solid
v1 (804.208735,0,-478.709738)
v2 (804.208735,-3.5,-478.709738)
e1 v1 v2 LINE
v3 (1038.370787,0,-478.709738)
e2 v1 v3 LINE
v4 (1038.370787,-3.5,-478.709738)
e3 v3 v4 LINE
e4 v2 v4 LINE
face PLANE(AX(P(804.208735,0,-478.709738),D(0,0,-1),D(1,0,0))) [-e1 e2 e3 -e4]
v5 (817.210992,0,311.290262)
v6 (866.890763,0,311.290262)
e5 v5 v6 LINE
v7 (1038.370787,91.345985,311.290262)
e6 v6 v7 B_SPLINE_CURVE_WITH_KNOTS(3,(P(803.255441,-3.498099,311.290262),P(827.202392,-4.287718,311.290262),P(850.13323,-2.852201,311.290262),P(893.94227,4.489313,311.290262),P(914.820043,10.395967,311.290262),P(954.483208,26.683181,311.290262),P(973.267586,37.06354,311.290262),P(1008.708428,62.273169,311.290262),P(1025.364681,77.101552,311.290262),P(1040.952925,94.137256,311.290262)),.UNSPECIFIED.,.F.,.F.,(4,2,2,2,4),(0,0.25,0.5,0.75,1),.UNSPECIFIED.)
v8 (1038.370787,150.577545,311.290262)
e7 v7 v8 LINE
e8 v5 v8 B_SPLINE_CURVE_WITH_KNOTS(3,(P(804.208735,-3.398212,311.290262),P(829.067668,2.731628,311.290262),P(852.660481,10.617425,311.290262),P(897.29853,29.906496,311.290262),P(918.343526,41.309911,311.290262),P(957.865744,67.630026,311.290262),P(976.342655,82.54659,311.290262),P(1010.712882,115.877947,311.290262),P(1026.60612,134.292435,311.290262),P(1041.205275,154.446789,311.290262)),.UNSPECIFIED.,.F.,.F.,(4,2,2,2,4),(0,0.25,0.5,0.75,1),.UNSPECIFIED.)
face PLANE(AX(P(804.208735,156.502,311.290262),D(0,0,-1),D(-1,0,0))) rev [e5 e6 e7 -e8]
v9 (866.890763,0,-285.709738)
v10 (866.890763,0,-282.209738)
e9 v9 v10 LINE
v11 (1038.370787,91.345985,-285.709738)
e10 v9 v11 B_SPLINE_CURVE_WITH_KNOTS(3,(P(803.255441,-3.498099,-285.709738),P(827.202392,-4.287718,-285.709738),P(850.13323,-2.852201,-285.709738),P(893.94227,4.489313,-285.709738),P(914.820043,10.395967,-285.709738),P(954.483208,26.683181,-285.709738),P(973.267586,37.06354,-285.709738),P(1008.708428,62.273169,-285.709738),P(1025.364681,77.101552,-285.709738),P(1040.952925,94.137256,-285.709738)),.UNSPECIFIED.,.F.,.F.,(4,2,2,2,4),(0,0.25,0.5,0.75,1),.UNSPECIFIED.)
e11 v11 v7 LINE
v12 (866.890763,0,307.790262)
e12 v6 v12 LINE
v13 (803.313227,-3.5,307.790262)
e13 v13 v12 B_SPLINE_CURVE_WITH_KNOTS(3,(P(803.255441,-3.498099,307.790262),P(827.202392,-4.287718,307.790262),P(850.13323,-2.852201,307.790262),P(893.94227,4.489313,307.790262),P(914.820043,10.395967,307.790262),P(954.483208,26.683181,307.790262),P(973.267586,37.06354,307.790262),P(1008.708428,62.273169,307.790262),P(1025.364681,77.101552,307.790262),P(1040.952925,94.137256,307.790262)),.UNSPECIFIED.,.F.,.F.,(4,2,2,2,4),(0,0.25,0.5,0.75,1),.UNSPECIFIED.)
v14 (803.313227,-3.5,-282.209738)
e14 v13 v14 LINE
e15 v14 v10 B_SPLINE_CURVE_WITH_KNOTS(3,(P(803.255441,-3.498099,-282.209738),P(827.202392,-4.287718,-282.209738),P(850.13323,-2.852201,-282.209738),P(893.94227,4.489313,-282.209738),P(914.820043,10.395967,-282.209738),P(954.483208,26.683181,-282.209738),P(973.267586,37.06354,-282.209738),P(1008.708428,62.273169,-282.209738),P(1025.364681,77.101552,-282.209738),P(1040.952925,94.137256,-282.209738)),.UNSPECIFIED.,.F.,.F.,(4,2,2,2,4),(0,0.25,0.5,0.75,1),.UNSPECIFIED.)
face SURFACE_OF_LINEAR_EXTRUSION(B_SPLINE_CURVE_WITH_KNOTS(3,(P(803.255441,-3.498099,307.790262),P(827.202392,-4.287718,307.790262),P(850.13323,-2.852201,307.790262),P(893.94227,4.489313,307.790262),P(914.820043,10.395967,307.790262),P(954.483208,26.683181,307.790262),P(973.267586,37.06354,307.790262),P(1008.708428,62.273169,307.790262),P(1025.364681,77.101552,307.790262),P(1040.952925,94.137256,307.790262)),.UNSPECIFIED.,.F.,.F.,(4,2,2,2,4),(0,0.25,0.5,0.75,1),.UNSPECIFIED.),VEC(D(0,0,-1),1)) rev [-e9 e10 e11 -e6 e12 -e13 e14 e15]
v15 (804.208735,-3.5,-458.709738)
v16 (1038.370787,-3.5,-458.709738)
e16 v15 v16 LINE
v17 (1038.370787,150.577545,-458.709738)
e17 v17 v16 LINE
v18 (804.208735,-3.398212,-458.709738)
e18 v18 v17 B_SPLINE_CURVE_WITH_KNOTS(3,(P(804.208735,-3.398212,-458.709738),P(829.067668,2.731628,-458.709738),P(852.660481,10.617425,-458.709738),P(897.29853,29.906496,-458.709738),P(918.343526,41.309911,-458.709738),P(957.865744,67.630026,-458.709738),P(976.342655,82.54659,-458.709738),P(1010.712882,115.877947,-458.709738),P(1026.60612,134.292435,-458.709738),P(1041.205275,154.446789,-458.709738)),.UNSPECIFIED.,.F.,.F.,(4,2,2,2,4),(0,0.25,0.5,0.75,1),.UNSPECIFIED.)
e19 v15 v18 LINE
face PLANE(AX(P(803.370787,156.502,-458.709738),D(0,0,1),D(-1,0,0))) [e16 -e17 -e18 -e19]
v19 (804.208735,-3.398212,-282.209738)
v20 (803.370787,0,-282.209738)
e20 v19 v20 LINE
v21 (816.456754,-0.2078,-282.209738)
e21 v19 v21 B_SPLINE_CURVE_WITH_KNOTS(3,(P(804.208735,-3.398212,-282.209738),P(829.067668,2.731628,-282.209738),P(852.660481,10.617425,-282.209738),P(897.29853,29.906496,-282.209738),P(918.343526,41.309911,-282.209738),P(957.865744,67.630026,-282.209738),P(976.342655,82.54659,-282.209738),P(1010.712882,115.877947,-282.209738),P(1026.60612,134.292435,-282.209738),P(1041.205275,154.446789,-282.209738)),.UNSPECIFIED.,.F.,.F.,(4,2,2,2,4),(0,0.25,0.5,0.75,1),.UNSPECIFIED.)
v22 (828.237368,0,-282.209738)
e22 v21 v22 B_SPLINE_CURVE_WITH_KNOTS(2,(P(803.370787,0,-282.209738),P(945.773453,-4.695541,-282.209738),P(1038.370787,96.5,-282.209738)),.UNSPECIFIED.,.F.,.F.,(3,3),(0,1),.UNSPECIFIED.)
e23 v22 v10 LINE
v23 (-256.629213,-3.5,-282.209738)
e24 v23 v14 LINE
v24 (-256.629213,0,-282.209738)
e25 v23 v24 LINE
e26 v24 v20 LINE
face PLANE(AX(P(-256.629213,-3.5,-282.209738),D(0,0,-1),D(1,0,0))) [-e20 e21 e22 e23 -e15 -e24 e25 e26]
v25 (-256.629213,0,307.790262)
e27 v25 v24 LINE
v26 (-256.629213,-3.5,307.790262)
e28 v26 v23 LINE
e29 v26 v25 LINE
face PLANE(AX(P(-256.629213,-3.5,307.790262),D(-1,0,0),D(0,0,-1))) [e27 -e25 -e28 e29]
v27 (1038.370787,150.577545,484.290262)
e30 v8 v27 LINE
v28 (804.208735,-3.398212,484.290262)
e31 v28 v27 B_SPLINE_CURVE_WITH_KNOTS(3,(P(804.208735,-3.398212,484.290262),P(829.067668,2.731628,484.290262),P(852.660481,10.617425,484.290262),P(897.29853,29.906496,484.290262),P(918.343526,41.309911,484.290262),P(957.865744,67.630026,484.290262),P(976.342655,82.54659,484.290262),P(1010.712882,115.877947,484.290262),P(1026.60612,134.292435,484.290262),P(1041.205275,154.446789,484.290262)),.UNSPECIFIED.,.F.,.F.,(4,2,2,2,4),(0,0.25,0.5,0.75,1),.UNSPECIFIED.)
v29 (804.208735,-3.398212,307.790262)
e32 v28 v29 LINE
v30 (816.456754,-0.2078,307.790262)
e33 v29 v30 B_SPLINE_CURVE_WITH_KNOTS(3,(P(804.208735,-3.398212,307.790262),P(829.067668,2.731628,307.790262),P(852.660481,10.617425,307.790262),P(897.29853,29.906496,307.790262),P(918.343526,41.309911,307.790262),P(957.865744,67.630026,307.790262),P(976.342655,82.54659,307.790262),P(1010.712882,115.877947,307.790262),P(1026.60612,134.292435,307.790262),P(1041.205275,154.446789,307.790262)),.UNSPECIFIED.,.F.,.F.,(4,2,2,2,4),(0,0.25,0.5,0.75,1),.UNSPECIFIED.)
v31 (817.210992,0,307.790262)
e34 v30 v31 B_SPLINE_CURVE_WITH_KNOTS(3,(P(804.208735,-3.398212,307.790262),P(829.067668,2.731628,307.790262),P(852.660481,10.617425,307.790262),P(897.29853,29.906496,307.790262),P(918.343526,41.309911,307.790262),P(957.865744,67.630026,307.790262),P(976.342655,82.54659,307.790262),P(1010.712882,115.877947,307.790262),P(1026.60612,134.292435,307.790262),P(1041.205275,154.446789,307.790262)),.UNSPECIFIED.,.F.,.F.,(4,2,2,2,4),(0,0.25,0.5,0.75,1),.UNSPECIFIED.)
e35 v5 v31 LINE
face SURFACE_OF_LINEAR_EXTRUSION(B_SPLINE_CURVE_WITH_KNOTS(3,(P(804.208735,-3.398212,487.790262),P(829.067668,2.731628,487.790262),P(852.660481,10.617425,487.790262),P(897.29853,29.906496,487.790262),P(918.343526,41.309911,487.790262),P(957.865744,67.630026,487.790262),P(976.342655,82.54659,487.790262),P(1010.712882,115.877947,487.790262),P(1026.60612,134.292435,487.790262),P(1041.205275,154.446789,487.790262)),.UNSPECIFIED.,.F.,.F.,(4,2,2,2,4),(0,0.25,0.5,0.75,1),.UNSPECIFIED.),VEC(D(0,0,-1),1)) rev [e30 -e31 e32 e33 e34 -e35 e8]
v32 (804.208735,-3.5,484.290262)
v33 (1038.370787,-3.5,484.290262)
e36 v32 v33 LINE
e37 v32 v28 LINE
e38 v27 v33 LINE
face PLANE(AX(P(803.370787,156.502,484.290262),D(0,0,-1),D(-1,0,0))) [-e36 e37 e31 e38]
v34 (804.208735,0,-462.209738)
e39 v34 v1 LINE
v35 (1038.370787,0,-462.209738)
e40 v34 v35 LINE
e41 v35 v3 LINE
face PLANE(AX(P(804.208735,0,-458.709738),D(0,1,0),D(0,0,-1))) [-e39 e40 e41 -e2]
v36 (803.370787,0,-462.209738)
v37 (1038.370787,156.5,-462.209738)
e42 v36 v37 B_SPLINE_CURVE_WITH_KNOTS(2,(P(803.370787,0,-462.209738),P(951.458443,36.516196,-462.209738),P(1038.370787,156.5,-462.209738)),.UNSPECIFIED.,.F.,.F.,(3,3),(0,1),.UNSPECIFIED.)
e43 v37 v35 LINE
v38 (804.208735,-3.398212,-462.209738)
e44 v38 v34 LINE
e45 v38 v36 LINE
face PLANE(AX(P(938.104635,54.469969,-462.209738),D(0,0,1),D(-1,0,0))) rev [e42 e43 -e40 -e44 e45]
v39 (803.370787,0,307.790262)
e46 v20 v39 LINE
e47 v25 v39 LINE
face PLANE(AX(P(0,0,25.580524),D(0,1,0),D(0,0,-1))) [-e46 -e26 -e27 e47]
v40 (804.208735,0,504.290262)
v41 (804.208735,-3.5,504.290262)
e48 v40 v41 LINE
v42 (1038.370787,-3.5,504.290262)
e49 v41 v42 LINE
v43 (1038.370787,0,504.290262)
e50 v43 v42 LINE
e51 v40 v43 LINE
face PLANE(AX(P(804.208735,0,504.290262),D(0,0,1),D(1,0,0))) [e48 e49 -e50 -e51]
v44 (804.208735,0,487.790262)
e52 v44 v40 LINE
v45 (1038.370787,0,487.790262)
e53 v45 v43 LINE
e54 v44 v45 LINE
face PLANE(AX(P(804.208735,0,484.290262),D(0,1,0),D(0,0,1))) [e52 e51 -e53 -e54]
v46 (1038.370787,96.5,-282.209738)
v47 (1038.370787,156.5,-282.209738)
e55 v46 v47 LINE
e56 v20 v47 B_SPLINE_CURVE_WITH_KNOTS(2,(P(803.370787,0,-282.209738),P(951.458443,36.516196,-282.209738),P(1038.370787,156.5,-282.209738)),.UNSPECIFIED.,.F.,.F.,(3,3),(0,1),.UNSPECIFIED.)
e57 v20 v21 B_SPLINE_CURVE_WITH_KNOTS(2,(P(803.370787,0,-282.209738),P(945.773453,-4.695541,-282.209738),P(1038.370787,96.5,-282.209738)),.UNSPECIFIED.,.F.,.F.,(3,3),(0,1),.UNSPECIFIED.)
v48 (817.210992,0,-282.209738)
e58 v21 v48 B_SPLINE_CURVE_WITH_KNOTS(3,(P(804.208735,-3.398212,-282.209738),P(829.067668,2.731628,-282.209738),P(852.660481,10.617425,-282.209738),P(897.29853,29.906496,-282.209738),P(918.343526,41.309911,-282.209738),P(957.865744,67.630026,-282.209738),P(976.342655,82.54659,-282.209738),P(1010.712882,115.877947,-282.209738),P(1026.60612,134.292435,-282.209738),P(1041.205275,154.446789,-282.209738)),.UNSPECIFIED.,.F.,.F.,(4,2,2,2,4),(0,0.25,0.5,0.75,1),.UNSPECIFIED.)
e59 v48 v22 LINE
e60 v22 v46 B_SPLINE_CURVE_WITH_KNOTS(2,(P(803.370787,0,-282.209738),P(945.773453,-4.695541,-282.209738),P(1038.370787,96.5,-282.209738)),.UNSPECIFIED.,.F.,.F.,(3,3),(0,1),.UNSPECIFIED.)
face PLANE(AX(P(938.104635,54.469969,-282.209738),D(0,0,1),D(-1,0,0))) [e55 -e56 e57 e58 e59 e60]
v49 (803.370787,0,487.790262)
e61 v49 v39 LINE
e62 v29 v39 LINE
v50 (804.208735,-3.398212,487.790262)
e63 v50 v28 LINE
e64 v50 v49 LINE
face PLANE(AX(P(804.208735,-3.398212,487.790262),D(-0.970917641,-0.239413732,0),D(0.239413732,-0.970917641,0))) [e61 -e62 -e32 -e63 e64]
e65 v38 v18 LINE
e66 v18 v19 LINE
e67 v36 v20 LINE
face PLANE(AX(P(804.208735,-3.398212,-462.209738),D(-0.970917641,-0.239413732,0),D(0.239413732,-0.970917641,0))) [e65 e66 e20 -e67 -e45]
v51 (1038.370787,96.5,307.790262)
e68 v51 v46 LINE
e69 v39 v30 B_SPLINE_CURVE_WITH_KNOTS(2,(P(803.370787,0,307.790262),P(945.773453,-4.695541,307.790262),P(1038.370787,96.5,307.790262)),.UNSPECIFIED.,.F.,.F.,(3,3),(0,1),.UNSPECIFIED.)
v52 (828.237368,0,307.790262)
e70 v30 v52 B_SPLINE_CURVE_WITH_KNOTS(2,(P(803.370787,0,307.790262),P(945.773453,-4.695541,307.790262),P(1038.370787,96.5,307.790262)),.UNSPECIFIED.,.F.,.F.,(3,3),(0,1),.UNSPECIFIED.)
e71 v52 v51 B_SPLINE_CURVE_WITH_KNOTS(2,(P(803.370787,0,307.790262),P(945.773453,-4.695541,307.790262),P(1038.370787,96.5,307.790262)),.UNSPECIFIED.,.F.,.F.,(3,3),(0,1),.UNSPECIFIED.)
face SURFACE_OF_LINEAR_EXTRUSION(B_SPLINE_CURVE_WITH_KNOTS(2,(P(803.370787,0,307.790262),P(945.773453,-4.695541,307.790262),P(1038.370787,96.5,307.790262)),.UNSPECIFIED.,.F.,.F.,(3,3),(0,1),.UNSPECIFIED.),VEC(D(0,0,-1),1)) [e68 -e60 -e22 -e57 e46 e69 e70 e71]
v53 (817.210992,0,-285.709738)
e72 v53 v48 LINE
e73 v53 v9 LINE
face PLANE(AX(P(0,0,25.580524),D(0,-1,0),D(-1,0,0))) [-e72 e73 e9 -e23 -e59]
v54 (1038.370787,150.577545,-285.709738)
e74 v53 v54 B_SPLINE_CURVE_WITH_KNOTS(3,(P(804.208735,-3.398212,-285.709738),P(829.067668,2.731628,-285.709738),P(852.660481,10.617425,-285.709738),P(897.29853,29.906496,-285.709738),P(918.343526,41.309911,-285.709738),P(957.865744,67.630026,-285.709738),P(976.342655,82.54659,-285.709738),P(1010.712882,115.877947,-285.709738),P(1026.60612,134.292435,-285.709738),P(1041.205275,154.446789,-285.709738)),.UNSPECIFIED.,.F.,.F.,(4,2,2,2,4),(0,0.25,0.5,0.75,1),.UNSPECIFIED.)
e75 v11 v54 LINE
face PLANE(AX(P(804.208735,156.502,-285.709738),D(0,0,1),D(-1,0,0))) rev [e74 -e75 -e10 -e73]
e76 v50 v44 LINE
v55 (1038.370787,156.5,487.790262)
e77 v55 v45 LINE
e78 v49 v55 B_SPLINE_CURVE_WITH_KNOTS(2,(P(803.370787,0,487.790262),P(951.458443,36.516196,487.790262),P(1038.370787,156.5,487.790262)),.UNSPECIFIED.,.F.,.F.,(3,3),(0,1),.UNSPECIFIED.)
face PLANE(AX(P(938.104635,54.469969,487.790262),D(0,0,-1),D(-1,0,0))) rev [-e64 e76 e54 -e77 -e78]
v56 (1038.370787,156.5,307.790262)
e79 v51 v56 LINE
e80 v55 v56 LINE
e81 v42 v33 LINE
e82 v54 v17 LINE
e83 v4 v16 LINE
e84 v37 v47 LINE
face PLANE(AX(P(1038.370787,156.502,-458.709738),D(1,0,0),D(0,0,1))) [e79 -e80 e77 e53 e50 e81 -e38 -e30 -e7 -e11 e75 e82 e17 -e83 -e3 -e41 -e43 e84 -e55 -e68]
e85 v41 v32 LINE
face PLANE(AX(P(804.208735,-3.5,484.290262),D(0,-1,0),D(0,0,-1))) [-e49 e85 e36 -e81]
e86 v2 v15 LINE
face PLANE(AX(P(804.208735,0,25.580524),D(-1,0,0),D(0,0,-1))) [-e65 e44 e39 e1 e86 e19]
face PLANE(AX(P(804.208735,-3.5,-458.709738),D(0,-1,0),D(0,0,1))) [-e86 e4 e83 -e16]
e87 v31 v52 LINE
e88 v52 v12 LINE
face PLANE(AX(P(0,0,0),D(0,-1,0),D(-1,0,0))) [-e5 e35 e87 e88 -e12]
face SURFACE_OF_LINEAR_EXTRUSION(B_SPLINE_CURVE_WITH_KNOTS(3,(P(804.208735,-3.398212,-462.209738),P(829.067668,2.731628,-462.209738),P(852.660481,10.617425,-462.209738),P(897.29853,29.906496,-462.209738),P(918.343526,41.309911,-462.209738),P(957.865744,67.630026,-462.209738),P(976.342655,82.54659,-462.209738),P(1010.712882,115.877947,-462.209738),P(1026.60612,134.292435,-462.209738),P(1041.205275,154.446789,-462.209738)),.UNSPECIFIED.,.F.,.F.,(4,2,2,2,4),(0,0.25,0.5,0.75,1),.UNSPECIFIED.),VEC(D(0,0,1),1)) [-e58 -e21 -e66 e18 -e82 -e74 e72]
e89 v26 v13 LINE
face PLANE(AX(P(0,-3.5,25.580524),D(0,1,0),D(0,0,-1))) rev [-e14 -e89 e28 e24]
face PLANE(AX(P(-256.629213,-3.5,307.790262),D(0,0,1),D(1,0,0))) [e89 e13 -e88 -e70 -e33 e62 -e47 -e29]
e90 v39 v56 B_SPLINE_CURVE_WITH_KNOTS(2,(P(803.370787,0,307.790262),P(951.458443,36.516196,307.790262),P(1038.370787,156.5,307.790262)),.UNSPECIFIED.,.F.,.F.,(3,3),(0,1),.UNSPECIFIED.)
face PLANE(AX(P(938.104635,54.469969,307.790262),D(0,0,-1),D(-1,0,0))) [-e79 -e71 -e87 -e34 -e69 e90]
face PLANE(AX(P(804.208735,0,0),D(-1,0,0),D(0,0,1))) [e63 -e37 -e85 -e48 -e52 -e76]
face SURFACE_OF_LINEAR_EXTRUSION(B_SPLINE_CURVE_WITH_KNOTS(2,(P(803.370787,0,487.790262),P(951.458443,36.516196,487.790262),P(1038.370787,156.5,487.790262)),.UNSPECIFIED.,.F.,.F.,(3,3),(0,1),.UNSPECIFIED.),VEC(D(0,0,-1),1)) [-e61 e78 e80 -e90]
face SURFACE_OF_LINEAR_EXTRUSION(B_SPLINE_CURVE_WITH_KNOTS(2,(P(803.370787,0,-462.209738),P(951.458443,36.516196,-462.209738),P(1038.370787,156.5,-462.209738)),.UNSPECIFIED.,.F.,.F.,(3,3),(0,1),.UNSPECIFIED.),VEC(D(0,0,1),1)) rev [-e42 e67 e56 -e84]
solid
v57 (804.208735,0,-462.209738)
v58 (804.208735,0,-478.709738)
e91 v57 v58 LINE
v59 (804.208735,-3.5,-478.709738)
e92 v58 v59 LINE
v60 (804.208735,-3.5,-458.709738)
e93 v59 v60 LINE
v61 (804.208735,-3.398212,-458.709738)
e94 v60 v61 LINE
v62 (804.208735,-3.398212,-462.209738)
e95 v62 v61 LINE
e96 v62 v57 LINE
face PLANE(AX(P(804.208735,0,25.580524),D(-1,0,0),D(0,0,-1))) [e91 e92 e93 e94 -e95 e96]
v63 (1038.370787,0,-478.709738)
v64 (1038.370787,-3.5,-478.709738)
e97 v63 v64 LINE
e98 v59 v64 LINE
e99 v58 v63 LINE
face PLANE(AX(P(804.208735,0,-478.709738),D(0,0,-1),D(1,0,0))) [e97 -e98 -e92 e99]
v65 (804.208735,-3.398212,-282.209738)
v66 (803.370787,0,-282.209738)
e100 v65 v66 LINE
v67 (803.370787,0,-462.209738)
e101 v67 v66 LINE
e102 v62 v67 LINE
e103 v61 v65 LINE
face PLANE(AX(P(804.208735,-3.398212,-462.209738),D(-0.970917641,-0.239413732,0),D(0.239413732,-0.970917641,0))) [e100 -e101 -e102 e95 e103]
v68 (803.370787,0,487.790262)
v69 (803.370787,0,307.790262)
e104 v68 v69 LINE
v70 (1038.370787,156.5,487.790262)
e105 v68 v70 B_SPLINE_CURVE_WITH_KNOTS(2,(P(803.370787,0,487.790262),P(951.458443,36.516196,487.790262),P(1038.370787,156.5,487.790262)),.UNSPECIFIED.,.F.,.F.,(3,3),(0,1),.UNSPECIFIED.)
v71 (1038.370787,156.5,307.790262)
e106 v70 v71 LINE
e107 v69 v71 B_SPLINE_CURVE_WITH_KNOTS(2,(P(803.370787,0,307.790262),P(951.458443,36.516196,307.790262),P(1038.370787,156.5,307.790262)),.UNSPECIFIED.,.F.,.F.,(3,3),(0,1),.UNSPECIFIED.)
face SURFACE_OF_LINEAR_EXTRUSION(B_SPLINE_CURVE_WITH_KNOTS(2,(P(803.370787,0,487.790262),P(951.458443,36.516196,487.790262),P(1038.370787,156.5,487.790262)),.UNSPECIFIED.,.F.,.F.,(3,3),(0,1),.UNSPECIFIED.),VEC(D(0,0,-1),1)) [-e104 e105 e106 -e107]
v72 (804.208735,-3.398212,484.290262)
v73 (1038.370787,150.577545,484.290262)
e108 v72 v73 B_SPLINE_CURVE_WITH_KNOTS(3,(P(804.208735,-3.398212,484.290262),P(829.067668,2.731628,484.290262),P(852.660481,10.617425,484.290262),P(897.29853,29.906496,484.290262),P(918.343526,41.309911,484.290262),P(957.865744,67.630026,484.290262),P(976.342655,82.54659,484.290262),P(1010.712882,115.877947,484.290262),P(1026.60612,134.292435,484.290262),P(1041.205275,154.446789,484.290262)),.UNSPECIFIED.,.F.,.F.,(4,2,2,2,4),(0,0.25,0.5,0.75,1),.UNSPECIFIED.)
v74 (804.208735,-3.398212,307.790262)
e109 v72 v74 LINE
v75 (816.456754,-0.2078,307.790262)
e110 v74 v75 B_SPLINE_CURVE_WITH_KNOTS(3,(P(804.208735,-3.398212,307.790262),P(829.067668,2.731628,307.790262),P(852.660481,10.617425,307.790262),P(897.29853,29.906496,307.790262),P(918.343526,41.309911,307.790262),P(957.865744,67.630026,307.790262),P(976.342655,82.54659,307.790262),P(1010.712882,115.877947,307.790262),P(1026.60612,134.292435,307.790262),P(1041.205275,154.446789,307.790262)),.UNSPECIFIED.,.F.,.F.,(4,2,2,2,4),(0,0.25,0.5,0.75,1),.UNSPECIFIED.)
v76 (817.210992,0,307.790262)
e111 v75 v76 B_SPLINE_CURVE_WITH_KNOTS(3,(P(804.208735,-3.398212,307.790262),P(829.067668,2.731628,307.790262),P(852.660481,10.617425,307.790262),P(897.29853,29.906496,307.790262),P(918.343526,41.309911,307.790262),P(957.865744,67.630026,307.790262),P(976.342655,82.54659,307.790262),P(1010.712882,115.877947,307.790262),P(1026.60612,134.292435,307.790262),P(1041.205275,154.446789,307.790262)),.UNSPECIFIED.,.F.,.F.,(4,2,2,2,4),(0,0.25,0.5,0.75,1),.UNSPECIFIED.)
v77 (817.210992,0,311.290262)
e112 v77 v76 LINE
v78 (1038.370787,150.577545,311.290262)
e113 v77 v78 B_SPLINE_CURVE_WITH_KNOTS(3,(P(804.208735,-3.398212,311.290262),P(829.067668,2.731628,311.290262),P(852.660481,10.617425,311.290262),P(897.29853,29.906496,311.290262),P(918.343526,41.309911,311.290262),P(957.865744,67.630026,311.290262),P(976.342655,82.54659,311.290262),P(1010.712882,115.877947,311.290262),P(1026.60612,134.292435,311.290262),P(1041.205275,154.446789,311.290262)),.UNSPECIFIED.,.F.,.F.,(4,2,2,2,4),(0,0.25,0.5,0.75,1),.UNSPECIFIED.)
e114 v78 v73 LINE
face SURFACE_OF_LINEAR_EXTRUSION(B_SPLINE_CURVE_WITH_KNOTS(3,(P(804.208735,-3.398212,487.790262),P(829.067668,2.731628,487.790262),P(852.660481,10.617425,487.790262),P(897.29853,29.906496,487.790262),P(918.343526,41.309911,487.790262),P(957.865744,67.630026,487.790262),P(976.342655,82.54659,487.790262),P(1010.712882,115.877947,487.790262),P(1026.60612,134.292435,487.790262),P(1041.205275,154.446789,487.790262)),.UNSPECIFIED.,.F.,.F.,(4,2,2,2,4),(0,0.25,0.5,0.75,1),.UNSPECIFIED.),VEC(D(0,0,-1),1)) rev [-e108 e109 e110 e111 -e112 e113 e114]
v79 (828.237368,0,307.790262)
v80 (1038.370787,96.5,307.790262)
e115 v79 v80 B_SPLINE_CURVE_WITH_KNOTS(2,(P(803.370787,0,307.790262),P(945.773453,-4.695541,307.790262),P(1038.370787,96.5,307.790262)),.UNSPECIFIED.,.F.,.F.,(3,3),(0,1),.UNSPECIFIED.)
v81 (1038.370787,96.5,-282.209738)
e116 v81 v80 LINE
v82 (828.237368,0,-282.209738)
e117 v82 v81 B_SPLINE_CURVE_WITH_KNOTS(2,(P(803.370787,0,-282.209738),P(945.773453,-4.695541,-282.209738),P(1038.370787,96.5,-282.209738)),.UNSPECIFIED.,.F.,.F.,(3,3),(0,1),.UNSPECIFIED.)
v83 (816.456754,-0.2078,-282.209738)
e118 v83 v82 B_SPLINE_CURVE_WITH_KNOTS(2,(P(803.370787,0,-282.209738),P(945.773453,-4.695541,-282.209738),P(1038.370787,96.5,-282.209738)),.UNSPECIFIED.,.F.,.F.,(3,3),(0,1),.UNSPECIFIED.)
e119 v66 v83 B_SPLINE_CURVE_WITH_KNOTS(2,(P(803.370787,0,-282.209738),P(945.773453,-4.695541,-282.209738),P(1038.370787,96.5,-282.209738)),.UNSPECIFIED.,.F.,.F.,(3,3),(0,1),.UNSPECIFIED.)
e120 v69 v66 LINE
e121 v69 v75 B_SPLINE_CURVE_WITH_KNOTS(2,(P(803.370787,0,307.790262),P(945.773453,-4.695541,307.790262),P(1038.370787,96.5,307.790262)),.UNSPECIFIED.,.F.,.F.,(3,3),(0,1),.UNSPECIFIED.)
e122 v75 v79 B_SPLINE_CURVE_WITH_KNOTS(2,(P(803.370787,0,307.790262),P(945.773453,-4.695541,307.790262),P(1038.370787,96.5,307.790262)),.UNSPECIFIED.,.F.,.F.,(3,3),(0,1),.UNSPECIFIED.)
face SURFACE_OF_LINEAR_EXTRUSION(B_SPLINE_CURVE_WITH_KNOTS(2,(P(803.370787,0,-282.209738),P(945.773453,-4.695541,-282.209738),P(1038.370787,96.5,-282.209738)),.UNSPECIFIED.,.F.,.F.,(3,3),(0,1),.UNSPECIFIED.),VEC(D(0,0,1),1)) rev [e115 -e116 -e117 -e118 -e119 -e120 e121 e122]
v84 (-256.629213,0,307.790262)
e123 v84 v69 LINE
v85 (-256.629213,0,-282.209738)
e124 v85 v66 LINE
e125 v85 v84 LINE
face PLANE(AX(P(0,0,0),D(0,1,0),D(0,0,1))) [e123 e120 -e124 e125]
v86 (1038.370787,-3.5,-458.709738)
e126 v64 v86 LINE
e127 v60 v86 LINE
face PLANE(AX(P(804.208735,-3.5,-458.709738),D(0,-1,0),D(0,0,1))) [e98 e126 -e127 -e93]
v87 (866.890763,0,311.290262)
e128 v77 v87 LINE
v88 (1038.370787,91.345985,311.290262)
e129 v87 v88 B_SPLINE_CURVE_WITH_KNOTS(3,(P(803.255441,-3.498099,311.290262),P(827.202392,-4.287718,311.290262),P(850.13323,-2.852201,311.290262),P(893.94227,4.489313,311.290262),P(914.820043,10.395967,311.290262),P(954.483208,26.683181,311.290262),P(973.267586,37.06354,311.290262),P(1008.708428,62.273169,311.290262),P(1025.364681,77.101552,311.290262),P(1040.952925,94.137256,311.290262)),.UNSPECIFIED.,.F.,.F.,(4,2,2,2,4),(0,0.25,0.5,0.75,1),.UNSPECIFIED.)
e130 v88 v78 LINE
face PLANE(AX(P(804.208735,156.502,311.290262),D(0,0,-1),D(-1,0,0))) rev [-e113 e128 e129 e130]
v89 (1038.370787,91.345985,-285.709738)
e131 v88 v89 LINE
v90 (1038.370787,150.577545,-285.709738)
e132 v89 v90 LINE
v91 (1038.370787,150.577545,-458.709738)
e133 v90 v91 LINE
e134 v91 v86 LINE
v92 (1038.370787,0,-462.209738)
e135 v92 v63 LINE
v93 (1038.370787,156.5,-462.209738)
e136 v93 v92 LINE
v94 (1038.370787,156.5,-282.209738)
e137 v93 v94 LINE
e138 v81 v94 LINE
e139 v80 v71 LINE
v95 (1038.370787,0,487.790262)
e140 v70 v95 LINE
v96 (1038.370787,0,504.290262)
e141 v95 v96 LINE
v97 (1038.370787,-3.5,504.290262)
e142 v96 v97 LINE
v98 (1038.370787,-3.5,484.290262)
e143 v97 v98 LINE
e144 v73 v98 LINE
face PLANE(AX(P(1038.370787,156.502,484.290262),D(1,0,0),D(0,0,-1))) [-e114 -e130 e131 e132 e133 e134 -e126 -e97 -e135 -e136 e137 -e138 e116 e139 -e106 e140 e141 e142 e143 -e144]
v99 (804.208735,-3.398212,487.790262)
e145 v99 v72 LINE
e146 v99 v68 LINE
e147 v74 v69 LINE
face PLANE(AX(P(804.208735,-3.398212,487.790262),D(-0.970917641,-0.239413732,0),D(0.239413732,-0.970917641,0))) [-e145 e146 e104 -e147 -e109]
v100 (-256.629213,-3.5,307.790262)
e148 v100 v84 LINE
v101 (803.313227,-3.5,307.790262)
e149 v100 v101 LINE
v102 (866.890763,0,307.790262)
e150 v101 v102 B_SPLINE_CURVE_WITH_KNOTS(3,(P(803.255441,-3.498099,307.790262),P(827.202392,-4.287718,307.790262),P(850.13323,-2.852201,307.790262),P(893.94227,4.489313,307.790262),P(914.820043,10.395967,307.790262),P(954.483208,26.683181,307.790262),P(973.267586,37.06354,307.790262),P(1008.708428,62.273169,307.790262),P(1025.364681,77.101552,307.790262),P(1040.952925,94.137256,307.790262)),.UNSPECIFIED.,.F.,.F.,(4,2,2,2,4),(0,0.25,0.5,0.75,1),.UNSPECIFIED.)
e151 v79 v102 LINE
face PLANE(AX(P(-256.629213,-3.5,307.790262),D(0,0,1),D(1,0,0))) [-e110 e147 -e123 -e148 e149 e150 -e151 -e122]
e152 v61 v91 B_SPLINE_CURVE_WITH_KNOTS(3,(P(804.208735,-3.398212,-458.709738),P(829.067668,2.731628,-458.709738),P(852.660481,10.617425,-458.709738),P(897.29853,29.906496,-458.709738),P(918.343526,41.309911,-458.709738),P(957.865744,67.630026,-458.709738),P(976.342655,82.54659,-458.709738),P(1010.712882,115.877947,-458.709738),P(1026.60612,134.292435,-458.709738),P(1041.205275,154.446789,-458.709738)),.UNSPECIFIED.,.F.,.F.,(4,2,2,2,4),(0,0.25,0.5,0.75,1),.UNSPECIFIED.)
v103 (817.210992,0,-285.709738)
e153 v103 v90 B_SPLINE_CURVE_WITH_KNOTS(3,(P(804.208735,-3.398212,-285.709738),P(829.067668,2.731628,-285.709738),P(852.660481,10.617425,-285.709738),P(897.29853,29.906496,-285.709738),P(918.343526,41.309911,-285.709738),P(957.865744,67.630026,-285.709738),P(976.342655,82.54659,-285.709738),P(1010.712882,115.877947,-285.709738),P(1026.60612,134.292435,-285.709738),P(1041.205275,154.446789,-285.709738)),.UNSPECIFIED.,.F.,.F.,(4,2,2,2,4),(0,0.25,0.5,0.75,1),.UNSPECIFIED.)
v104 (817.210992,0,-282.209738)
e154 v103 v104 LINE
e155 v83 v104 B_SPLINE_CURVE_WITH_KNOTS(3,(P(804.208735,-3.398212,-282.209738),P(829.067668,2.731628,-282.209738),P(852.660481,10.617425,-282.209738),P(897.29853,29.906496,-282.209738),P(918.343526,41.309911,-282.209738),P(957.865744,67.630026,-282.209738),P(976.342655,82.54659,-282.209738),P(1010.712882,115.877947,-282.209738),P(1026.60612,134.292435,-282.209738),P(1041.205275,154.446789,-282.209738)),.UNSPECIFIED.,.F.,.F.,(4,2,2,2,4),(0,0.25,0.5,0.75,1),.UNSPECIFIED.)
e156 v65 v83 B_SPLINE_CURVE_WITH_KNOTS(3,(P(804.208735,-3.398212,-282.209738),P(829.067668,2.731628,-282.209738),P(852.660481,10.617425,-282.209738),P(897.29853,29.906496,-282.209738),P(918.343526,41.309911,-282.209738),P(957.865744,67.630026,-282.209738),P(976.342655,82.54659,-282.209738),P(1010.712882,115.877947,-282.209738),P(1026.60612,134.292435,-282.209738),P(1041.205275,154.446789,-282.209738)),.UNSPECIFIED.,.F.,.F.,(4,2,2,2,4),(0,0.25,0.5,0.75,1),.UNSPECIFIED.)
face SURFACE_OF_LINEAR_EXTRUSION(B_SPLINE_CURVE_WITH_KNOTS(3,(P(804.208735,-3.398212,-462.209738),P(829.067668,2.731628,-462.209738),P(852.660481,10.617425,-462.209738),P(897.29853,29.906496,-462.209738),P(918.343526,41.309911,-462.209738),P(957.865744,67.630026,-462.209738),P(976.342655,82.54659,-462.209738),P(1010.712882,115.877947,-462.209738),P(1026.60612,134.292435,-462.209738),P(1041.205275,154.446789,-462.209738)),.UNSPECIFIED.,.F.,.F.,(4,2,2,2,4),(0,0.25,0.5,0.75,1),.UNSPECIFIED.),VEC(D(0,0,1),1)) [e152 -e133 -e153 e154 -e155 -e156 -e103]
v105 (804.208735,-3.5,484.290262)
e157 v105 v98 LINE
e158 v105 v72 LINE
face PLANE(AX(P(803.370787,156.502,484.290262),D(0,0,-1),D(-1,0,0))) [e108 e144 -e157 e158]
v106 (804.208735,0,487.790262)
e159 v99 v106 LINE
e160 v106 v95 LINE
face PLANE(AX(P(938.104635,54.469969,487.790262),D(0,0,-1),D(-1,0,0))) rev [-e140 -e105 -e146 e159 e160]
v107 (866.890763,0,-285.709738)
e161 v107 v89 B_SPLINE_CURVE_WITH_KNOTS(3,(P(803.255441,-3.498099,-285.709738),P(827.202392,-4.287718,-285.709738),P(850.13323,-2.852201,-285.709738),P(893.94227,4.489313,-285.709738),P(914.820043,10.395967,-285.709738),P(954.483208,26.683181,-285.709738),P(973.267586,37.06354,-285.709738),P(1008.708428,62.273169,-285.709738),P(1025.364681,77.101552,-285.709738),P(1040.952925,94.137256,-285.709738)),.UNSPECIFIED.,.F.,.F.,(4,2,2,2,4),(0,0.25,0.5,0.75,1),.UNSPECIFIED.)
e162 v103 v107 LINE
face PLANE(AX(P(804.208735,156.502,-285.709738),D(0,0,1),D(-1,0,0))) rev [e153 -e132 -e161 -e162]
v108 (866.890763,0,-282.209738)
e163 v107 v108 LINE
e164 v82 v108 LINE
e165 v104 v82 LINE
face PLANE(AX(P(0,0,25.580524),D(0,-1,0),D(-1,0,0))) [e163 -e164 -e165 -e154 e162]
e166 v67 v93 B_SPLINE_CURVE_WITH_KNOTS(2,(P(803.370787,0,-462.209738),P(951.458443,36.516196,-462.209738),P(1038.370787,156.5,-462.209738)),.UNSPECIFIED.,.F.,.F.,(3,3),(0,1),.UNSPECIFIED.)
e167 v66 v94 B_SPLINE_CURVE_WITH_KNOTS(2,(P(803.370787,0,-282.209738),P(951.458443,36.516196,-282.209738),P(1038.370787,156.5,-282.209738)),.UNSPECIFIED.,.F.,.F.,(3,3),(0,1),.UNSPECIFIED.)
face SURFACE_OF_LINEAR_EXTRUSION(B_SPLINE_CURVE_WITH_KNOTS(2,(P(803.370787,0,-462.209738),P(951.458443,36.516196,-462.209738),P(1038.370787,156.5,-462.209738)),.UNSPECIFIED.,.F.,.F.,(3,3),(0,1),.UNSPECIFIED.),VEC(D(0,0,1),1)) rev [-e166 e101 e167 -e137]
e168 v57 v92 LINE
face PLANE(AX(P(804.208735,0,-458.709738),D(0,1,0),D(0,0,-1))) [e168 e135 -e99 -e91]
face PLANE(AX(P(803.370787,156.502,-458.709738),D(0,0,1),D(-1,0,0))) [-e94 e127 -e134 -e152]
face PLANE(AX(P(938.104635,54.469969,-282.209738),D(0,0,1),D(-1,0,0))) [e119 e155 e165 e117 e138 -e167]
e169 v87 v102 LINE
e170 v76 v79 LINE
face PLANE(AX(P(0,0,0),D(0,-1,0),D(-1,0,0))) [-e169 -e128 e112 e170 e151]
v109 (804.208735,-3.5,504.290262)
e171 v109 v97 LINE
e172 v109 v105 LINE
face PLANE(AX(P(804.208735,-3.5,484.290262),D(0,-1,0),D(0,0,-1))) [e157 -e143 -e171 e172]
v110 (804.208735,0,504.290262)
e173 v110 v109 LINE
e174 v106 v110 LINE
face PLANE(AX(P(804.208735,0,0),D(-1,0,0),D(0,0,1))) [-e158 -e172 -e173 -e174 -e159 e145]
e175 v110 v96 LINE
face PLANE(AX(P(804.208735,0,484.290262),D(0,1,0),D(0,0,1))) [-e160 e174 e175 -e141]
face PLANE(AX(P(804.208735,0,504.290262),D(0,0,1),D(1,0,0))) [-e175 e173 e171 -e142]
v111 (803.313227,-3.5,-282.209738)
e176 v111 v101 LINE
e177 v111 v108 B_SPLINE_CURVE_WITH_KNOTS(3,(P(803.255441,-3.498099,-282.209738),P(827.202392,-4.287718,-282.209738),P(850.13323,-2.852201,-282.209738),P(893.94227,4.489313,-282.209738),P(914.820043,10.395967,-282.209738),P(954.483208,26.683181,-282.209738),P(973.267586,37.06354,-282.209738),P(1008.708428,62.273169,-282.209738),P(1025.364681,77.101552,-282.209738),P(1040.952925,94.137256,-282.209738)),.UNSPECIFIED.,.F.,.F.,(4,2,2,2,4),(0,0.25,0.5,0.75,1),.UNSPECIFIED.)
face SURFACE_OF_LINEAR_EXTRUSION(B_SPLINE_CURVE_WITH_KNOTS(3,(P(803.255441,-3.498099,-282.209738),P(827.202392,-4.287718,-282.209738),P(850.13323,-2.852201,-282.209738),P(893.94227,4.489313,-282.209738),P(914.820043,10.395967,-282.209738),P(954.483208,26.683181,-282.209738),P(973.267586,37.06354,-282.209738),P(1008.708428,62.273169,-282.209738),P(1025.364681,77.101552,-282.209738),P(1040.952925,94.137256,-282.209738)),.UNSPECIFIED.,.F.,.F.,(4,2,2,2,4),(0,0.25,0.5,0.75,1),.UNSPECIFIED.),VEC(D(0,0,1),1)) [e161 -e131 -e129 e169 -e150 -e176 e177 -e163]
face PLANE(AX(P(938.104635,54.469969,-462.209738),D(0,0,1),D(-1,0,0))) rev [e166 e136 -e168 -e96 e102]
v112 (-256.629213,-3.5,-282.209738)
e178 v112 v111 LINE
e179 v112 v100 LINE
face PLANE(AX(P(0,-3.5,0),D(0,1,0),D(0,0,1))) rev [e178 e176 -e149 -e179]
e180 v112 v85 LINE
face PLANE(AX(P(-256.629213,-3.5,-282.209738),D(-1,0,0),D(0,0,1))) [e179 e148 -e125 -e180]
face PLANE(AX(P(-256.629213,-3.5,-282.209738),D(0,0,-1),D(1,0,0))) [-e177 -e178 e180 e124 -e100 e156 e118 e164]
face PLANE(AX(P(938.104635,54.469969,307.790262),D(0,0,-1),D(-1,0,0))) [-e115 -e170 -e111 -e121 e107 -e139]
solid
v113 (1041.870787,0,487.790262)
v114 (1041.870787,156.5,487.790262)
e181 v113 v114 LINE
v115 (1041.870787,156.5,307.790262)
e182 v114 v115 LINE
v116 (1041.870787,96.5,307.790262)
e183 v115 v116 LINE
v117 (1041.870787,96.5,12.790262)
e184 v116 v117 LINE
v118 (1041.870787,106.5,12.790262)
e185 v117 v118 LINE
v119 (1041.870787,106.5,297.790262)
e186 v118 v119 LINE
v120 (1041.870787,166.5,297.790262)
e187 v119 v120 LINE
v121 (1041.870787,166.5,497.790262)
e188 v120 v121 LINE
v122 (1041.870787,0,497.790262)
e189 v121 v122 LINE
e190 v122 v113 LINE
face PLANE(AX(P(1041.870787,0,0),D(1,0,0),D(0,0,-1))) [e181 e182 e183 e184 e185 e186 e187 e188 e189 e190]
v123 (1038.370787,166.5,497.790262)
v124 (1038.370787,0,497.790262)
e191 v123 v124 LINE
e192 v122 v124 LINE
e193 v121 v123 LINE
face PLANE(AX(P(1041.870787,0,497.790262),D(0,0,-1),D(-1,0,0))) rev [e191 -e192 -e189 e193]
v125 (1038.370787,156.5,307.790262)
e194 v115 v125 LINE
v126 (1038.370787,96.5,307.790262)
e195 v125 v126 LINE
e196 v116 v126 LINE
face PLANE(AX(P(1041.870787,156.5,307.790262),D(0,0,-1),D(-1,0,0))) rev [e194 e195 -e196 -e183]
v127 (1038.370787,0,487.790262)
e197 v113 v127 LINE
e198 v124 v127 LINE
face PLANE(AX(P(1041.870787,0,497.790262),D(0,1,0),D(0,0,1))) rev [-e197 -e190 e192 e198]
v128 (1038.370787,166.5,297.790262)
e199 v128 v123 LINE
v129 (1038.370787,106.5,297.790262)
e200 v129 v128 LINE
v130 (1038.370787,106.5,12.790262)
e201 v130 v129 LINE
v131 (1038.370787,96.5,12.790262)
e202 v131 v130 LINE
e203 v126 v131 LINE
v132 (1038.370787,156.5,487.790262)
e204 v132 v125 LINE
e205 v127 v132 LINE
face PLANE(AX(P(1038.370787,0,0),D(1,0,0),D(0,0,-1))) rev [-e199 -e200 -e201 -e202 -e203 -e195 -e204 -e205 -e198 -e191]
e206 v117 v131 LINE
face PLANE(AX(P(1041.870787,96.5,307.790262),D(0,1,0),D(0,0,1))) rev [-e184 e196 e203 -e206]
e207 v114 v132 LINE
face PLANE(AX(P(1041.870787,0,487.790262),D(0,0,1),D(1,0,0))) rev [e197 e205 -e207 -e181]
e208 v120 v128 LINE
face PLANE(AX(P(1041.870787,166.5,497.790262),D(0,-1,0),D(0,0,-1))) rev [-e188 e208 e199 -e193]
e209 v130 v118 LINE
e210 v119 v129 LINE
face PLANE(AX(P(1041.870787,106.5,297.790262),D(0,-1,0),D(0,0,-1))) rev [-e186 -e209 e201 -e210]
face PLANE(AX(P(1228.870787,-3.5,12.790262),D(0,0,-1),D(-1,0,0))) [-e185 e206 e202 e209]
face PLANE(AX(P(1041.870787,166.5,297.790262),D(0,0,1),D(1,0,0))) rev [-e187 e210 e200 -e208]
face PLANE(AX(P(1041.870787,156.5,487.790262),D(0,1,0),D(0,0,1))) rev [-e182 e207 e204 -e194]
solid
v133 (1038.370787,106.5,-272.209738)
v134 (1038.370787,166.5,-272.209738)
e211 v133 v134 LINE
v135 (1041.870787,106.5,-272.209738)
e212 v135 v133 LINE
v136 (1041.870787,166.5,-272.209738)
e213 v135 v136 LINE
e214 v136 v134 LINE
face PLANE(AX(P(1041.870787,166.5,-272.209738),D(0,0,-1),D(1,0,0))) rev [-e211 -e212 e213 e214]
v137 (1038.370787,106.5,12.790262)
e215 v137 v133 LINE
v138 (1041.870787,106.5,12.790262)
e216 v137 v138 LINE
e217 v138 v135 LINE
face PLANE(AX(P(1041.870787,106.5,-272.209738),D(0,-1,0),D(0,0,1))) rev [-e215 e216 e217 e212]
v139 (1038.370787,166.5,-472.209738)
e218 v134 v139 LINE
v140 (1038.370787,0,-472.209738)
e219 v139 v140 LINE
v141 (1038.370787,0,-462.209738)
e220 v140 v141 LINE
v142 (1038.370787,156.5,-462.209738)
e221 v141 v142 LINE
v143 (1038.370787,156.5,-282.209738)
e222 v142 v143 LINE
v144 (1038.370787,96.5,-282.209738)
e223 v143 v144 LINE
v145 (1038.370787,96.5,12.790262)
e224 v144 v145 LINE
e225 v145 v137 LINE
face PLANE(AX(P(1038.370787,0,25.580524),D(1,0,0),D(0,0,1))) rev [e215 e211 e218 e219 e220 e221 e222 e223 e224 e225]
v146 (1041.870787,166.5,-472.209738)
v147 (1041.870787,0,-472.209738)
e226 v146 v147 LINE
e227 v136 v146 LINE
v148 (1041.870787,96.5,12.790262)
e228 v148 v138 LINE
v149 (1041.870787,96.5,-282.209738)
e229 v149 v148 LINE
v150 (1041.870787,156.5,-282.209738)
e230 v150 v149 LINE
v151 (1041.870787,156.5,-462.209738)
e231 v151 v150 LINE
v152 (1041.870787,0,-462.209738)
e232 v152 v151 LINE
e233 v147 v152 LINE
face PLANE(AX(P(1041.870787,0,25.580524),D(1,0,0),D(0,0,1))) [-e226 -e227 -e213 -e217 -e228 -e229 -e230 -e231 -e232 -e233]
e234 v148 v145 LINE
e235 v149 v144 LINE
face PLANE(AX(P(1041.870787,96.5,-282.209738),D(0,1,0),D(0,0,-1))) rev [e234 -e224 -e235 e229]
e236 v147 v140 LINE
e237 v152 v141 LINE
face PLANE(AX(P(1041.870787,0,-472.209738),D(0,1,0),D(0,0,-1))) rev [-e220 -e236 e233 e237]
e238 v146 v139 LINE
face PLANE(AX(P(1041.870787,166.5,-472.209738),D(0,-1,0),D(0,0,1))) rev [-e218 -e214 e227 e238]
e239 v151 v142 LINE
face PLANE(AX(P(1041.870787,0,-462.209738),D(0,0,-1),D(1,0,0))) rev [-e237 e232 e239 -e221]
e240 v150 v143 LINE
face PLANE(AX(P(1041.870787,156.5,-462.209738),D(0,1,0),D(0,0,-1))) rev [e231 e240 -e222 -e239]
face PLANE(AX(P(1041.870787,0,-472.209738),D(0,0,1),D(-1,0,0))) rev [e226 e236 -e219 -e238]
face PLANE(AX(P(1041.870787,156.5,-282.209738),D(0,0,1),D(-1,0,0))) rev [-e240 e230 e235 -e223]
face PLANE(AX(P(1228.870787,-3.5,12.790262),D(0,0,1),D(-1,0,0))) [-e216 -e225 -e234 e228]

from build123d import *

# Parameters (mm, degrees)
SKETCH1_W            = 1060
SKETCH1_H            = 590
BOSS_EXTRUDE1_DEPTH  = 3.5
EXTRUDE_THIN1_START  = -590
EXTRUDE_THIN1_DEPTH  = 590
EXTRUDE_THIN2_DEPTH  = 180
EXTRUDE_THIN3_REACH  = 1162.405
SKETCH11_W           = 236.744190684
SKETCH11_H           = 3.5
EXTRUDE_THIN4_REACH  = 1162.405
SKETCH13_W           = 235
SKETCH13_H           = 3.5
CUT_EXTRUDE1_START   = -950
SKETCH18_W           = 9.295788825
SKETCH18_H           = 156.5
CUT_EXTRUDE1_DEPTH   = 950
CUT_EXTRUDE2_DEPTH   = 35.5
BOSS_EXTRUDE9_DEPTH  = 3.5
SKETCH27_W           = 20
SKETCH27_H           = 3.5
BOSS_EXTRUDE10_DEPTH = 234.162052
SKETCH31_W           = 516.811278328
SKETCH31_H           = 219.504039685
CUT_EXTRUDE7_DEPTH   = 190.5
CUT_EXTRUDE8_START   = -1295
SKETCH32_W           = 505.926906796
SKETCH32_H           = 339.060315412
CUT_EXTRUDE8_DEPTH   = 1295


# Read off the part's stored shape, not the designer's step: Extrude-Thin1, Extrude-Thin2
with BuildPart() as part:
    # Sketch1 → Boss-Extrude1 (new body)
    with BuildSketch(Plane(origin=(0, 0, 0), x_dir=(1, 0, 0), z_dir=(0, 1, 0))):
        with Locations((273.370786517, -12.790262172)):
            Rectangle(SKETCH1_W, SKETCH1_H)
    extrude(amount=-BOSS_EXTRUDE1_DEPTH)

    # Extrude-Thin1 outline → Extrude-Thin1 (add)
    with BuildSketch(Plane.XY.offset(307.790262172).offset(EXTRUDE_THIN1_START)):
        with BuildLine():
            Line((803.370786517, -3.5), (803.313227264, -3.5))
            add(Edge.make_bspline(
                [(803.313227264, -3.5), (827.239281851, -4.28540716), (850.150849594, -2.84924817), (893.9422698, 4.489313064), (914.820042541, 10.395966502), (954.483208023, 26.683181264), (973.267586216, 37.063539809), (1008.708428447, 62.273168795), (1025.364681446, 77.101551974), (1040.952925263, 94.13725594)],
                knots=[0.000201097, 0.000201097, 0.000201097, 0.000201097, 0.25, 0.25, 0.5, 0.5, 0.75, 0.75, 1, 1, 1, 1], degree=3))
            Line((1040.952925263, 94.13725594), (1038.370786517, 96.5))
            add(Edge.make_bspline(
                [(803.370786517, 0), (945.773453098, -4.695540598), (1038.370786517, 96.5)],
                knots=[0, 0, 0, 1, 1, 1], degree=2))
            Line((803.370786517, 0), (803.370786517, -3.5))
        make_face()
    extrude(amount=EXTRUDE_THIN1_DEPTH)

    # Extrude-Thin2 outline → Extrude-Thin2 (add)
    with BuildSketch(Plane.XY.offset(307.790262172)):
        with BuildLine():
            Line((803.370786517, 0), (804.208734579, -3.398211742))
            add(Edge.make_bspline(
                [(804.208734579, -3.398211742), (829.067667959, 2.73162849), (852.660481385, 10.617424921), (897.298530323, 29.90649551), (918.34352591, 41.30991081), (957.865744307, 67.630026466), (976.342654863, 82.546590392), (1010.7128816, 115.877947479), (1026.606120018, 134.292434803), (1041.205275081, 154.446789202)],
                knots=[0, 0, 0, 0, 0.25, 0.25, 0.5, 0.5, 0.75, 0.75, 1, 1, 1, 1], degree=3))
            Line((1041.205275081, 154.446789202), (1038.370786517, 156.5))
            add(Edge.make_bspline(
                [(803.370786517, 0), (951.458443478, 36.516195756), (1038.370786517, 156.5)],
                knots=[0, 0, 0, 1, 1, 1], degree=2))
        make_face()
    extrude_thin2 = extrude(amount=EXTRUDE_THIN2_DEPTH)

    # Sketch11 → Extrude-Thin3 (add, up to next)
    with BuildSketch(Plane(origin=(0, 0, 0), x_dir=(1, 0, 0), z_dir=(0, 1, 0)), mode=Mode.PRIVATE) as extrude_thin3_sk1:
        with Locations((922.580829921, -309.540262172)):
            Rectangle(SKETCH11_W, SKETCH11_H)
    extrude_thin3_tool1 = extrude(extrude_thin3_sk1.sketch, amount=EXTRUDE_THIN3_REACH, mode=Mode.PRIVATE) - part.part
    extrude_thin3 = extrude_thin3_tool1.solids().sort_by_distance((922.58083, 0, 309.540262))[0]
    add(extrude_thin3)

    # Sketch13 → Extrude-Thin4 (add, up to next)
    with BuildSketch(Plane(origin=(0, 0, 0), x_dir=(1, 0, 0), z_dir=(0, 1, 0)), mode=Mode.PRIVATE) as extrude_thin4_sk1:
        with Locations((920.870786517, -486.040262172)):
            Rectangle(SKETCH13_W, SKETCH13_H)
    extrude_thin4_tool1 = extrude(extrude_thin4_sk1.sketch, amount=EXTRUDE_THIN4_REACH, mode=Mode.PRIVATE) - part.part
    extrude_thin4 = extrude_thin4_tool1.solids().sort_by_distance((920.870787, 0, 486.040262))[0]
    add(extrude_thin4)

    # Mirror1: Extrude-Thin2, Extrude-Thin3, Extrude-Thin4 across plane
    add(extrude_thin2.mirror(Plane.XY.offset(12.790262172)))
    add(extrude_thin3.mirror(Plane.XY.offset(12.790262172)))
    add(extrude_thin4.mirror(Plane.XY.offset(12.790262172)))

    # Sketch18 → Cut-Extrude1 (cut)
    with BuildSketch(Plane.XY.offset(487.790262172).offset(CUT_EXTRUDE1_START)):
        with Locations((1043.01868093, 78.25)):
            Rectangle(SKETCH18_W, SKETCH18_H)
    extrude(amount=CUT_EXTRUDE1_DEPTH, mode=Mode.SUBTRACT)

    # Sketch23 → Cut-Extrude2 (cut)
    with BuildSketch(Plane(origin=(0, 0, 307.790262172), x_dir=(-1, 0, 0), z_dir=(0, 0, -1))):
        with BuildLine():
            add(Edge.make_bspline(
                [(-866.890762603, 0), (-868.612672192, 0.259242322), (-870.328336217, 0.532092751), (-893.9422698, 4.489313064), (-914.820042541, 10.395966502), (-954.483208023, 26.683181264), (-973.267586216, 37.063539809), (-1007.733659748, 61.579800475), (-1023.528999951, 75.476914558), (-1038.370786517, 91.345985167)],
                knots=[0.230490173, 0.230490173, 0.230490173, 0.230490173, 0.25, 0.25, 0.5, 0.5, 0.75, 0.75, 0.986247947, 0.986247947, 0.986247947, 0.986247947], degree=3))
            Line((-1038.370786517, 91.345985167), (-1038.370786517, 0))
            Line((-1038.370786517, 0), (-866.890762603, 0))
        make_face()
    cut_extrude2 = extrude(amount=-CUT_EXTRUDE2_DEPTH, mode=Mode.SUBTRACT)

    # Mirror2: Cut-Extrude2 across plane
    add(cut_extrude2.mirror(Plane.XY.offset(12.790262172)), mode=Mode.SUBTRACT)

    # Sketch27 → Boss-Extrude10 (add)
    with BuildSketch(Plane(origin=(1038.370786517, 0, 0), x_dir=(0, 0, -1), z_dir=(1, 0, 0))):
        with Locations((-494.290262172, -1.75)):
            Rectangle(SKETCH27_W, SKETCH27_H)
    extrude(amount=-BOSS_EXTRUDE10_DEPTH)

    # Sketch32 → Cut-Extrude8 (cut)
    with BuildSketch(Plane(origin=(1038.370786517, 0, 0), x_dir=(0, 0, -1), z_dir=(1, 0, 0)).offset(CUT_EXTRUDE8_START)):
        with Locations((240.173191226, 40.919391946)):
            Rectangle(SKETCH32_W, SKETCH32_H)
    extrude(amount=CUT_EXTRUDE8_DEPTH, mode=Mode.SUBTRACT)

    # Mirror12: part across plane


with BuildPart() as body_2:
    # Sketch24 → Boss-Extrude9 (new body)
    with BuildSketch(Plane(origin=(1038.370786517, 0, 0), x_dir=(0, 0, -1), z_dir=(1, 0, 0))):
        Polygon((-497.790262172, 166.5), (-297.790262172, 166.5), (-297.790262172, 106.5), (272.209737828, 106.5), (272.209737828, 166.5), (472.209737828, 166.5), (472.209737828, -0.060643547), (462.209737828, 0), (462.209737828, 156.5), (282.209737828, 156.5), (282.209737828, 96.5), (-307.790262172, 96.5), (-307.790262172, 156.5), (-487.790262172, 156.5), (-487.790262172, 0), (-497.790262172, 0), align=None)
    extrude(amount=BOSS_EXTRUDE9_DEPTH)

    # Sketch31 → Cut-Extrude7 (cut)
    with BuildSketch(Plane(origin=(1038.370786517, 0, 0), x_dir=(0, 0, -1), z_dir=(1, 0, 0))):
        with Locations((245.615376992, 106.252019843)):
            Rectangle(SKETCH31_W, SKETCH31_H)
    extrude(amount=CUT_EXTRUDE7_DEPTH, mode=Mode.SUBTRACT)


with BuildPart() as part_1:
    add(part.part)
    add(part.part.mirror(Plane.XY.offset(12.790262172)))


with BuildPart() as body_3:
    # Mirror13: mirrored copy
    add(body_2.part.mirror(Plane.XY.offset(12.790262172)))


with BuildPart() as body_4:
    # Mirror13 2: mirrored copy
    add(part_1.part.mirror(Plane.XY.offset(12.790262172)))


solid = Compound([body_2.part, part_1.part, body_3.part, body_4.part])
